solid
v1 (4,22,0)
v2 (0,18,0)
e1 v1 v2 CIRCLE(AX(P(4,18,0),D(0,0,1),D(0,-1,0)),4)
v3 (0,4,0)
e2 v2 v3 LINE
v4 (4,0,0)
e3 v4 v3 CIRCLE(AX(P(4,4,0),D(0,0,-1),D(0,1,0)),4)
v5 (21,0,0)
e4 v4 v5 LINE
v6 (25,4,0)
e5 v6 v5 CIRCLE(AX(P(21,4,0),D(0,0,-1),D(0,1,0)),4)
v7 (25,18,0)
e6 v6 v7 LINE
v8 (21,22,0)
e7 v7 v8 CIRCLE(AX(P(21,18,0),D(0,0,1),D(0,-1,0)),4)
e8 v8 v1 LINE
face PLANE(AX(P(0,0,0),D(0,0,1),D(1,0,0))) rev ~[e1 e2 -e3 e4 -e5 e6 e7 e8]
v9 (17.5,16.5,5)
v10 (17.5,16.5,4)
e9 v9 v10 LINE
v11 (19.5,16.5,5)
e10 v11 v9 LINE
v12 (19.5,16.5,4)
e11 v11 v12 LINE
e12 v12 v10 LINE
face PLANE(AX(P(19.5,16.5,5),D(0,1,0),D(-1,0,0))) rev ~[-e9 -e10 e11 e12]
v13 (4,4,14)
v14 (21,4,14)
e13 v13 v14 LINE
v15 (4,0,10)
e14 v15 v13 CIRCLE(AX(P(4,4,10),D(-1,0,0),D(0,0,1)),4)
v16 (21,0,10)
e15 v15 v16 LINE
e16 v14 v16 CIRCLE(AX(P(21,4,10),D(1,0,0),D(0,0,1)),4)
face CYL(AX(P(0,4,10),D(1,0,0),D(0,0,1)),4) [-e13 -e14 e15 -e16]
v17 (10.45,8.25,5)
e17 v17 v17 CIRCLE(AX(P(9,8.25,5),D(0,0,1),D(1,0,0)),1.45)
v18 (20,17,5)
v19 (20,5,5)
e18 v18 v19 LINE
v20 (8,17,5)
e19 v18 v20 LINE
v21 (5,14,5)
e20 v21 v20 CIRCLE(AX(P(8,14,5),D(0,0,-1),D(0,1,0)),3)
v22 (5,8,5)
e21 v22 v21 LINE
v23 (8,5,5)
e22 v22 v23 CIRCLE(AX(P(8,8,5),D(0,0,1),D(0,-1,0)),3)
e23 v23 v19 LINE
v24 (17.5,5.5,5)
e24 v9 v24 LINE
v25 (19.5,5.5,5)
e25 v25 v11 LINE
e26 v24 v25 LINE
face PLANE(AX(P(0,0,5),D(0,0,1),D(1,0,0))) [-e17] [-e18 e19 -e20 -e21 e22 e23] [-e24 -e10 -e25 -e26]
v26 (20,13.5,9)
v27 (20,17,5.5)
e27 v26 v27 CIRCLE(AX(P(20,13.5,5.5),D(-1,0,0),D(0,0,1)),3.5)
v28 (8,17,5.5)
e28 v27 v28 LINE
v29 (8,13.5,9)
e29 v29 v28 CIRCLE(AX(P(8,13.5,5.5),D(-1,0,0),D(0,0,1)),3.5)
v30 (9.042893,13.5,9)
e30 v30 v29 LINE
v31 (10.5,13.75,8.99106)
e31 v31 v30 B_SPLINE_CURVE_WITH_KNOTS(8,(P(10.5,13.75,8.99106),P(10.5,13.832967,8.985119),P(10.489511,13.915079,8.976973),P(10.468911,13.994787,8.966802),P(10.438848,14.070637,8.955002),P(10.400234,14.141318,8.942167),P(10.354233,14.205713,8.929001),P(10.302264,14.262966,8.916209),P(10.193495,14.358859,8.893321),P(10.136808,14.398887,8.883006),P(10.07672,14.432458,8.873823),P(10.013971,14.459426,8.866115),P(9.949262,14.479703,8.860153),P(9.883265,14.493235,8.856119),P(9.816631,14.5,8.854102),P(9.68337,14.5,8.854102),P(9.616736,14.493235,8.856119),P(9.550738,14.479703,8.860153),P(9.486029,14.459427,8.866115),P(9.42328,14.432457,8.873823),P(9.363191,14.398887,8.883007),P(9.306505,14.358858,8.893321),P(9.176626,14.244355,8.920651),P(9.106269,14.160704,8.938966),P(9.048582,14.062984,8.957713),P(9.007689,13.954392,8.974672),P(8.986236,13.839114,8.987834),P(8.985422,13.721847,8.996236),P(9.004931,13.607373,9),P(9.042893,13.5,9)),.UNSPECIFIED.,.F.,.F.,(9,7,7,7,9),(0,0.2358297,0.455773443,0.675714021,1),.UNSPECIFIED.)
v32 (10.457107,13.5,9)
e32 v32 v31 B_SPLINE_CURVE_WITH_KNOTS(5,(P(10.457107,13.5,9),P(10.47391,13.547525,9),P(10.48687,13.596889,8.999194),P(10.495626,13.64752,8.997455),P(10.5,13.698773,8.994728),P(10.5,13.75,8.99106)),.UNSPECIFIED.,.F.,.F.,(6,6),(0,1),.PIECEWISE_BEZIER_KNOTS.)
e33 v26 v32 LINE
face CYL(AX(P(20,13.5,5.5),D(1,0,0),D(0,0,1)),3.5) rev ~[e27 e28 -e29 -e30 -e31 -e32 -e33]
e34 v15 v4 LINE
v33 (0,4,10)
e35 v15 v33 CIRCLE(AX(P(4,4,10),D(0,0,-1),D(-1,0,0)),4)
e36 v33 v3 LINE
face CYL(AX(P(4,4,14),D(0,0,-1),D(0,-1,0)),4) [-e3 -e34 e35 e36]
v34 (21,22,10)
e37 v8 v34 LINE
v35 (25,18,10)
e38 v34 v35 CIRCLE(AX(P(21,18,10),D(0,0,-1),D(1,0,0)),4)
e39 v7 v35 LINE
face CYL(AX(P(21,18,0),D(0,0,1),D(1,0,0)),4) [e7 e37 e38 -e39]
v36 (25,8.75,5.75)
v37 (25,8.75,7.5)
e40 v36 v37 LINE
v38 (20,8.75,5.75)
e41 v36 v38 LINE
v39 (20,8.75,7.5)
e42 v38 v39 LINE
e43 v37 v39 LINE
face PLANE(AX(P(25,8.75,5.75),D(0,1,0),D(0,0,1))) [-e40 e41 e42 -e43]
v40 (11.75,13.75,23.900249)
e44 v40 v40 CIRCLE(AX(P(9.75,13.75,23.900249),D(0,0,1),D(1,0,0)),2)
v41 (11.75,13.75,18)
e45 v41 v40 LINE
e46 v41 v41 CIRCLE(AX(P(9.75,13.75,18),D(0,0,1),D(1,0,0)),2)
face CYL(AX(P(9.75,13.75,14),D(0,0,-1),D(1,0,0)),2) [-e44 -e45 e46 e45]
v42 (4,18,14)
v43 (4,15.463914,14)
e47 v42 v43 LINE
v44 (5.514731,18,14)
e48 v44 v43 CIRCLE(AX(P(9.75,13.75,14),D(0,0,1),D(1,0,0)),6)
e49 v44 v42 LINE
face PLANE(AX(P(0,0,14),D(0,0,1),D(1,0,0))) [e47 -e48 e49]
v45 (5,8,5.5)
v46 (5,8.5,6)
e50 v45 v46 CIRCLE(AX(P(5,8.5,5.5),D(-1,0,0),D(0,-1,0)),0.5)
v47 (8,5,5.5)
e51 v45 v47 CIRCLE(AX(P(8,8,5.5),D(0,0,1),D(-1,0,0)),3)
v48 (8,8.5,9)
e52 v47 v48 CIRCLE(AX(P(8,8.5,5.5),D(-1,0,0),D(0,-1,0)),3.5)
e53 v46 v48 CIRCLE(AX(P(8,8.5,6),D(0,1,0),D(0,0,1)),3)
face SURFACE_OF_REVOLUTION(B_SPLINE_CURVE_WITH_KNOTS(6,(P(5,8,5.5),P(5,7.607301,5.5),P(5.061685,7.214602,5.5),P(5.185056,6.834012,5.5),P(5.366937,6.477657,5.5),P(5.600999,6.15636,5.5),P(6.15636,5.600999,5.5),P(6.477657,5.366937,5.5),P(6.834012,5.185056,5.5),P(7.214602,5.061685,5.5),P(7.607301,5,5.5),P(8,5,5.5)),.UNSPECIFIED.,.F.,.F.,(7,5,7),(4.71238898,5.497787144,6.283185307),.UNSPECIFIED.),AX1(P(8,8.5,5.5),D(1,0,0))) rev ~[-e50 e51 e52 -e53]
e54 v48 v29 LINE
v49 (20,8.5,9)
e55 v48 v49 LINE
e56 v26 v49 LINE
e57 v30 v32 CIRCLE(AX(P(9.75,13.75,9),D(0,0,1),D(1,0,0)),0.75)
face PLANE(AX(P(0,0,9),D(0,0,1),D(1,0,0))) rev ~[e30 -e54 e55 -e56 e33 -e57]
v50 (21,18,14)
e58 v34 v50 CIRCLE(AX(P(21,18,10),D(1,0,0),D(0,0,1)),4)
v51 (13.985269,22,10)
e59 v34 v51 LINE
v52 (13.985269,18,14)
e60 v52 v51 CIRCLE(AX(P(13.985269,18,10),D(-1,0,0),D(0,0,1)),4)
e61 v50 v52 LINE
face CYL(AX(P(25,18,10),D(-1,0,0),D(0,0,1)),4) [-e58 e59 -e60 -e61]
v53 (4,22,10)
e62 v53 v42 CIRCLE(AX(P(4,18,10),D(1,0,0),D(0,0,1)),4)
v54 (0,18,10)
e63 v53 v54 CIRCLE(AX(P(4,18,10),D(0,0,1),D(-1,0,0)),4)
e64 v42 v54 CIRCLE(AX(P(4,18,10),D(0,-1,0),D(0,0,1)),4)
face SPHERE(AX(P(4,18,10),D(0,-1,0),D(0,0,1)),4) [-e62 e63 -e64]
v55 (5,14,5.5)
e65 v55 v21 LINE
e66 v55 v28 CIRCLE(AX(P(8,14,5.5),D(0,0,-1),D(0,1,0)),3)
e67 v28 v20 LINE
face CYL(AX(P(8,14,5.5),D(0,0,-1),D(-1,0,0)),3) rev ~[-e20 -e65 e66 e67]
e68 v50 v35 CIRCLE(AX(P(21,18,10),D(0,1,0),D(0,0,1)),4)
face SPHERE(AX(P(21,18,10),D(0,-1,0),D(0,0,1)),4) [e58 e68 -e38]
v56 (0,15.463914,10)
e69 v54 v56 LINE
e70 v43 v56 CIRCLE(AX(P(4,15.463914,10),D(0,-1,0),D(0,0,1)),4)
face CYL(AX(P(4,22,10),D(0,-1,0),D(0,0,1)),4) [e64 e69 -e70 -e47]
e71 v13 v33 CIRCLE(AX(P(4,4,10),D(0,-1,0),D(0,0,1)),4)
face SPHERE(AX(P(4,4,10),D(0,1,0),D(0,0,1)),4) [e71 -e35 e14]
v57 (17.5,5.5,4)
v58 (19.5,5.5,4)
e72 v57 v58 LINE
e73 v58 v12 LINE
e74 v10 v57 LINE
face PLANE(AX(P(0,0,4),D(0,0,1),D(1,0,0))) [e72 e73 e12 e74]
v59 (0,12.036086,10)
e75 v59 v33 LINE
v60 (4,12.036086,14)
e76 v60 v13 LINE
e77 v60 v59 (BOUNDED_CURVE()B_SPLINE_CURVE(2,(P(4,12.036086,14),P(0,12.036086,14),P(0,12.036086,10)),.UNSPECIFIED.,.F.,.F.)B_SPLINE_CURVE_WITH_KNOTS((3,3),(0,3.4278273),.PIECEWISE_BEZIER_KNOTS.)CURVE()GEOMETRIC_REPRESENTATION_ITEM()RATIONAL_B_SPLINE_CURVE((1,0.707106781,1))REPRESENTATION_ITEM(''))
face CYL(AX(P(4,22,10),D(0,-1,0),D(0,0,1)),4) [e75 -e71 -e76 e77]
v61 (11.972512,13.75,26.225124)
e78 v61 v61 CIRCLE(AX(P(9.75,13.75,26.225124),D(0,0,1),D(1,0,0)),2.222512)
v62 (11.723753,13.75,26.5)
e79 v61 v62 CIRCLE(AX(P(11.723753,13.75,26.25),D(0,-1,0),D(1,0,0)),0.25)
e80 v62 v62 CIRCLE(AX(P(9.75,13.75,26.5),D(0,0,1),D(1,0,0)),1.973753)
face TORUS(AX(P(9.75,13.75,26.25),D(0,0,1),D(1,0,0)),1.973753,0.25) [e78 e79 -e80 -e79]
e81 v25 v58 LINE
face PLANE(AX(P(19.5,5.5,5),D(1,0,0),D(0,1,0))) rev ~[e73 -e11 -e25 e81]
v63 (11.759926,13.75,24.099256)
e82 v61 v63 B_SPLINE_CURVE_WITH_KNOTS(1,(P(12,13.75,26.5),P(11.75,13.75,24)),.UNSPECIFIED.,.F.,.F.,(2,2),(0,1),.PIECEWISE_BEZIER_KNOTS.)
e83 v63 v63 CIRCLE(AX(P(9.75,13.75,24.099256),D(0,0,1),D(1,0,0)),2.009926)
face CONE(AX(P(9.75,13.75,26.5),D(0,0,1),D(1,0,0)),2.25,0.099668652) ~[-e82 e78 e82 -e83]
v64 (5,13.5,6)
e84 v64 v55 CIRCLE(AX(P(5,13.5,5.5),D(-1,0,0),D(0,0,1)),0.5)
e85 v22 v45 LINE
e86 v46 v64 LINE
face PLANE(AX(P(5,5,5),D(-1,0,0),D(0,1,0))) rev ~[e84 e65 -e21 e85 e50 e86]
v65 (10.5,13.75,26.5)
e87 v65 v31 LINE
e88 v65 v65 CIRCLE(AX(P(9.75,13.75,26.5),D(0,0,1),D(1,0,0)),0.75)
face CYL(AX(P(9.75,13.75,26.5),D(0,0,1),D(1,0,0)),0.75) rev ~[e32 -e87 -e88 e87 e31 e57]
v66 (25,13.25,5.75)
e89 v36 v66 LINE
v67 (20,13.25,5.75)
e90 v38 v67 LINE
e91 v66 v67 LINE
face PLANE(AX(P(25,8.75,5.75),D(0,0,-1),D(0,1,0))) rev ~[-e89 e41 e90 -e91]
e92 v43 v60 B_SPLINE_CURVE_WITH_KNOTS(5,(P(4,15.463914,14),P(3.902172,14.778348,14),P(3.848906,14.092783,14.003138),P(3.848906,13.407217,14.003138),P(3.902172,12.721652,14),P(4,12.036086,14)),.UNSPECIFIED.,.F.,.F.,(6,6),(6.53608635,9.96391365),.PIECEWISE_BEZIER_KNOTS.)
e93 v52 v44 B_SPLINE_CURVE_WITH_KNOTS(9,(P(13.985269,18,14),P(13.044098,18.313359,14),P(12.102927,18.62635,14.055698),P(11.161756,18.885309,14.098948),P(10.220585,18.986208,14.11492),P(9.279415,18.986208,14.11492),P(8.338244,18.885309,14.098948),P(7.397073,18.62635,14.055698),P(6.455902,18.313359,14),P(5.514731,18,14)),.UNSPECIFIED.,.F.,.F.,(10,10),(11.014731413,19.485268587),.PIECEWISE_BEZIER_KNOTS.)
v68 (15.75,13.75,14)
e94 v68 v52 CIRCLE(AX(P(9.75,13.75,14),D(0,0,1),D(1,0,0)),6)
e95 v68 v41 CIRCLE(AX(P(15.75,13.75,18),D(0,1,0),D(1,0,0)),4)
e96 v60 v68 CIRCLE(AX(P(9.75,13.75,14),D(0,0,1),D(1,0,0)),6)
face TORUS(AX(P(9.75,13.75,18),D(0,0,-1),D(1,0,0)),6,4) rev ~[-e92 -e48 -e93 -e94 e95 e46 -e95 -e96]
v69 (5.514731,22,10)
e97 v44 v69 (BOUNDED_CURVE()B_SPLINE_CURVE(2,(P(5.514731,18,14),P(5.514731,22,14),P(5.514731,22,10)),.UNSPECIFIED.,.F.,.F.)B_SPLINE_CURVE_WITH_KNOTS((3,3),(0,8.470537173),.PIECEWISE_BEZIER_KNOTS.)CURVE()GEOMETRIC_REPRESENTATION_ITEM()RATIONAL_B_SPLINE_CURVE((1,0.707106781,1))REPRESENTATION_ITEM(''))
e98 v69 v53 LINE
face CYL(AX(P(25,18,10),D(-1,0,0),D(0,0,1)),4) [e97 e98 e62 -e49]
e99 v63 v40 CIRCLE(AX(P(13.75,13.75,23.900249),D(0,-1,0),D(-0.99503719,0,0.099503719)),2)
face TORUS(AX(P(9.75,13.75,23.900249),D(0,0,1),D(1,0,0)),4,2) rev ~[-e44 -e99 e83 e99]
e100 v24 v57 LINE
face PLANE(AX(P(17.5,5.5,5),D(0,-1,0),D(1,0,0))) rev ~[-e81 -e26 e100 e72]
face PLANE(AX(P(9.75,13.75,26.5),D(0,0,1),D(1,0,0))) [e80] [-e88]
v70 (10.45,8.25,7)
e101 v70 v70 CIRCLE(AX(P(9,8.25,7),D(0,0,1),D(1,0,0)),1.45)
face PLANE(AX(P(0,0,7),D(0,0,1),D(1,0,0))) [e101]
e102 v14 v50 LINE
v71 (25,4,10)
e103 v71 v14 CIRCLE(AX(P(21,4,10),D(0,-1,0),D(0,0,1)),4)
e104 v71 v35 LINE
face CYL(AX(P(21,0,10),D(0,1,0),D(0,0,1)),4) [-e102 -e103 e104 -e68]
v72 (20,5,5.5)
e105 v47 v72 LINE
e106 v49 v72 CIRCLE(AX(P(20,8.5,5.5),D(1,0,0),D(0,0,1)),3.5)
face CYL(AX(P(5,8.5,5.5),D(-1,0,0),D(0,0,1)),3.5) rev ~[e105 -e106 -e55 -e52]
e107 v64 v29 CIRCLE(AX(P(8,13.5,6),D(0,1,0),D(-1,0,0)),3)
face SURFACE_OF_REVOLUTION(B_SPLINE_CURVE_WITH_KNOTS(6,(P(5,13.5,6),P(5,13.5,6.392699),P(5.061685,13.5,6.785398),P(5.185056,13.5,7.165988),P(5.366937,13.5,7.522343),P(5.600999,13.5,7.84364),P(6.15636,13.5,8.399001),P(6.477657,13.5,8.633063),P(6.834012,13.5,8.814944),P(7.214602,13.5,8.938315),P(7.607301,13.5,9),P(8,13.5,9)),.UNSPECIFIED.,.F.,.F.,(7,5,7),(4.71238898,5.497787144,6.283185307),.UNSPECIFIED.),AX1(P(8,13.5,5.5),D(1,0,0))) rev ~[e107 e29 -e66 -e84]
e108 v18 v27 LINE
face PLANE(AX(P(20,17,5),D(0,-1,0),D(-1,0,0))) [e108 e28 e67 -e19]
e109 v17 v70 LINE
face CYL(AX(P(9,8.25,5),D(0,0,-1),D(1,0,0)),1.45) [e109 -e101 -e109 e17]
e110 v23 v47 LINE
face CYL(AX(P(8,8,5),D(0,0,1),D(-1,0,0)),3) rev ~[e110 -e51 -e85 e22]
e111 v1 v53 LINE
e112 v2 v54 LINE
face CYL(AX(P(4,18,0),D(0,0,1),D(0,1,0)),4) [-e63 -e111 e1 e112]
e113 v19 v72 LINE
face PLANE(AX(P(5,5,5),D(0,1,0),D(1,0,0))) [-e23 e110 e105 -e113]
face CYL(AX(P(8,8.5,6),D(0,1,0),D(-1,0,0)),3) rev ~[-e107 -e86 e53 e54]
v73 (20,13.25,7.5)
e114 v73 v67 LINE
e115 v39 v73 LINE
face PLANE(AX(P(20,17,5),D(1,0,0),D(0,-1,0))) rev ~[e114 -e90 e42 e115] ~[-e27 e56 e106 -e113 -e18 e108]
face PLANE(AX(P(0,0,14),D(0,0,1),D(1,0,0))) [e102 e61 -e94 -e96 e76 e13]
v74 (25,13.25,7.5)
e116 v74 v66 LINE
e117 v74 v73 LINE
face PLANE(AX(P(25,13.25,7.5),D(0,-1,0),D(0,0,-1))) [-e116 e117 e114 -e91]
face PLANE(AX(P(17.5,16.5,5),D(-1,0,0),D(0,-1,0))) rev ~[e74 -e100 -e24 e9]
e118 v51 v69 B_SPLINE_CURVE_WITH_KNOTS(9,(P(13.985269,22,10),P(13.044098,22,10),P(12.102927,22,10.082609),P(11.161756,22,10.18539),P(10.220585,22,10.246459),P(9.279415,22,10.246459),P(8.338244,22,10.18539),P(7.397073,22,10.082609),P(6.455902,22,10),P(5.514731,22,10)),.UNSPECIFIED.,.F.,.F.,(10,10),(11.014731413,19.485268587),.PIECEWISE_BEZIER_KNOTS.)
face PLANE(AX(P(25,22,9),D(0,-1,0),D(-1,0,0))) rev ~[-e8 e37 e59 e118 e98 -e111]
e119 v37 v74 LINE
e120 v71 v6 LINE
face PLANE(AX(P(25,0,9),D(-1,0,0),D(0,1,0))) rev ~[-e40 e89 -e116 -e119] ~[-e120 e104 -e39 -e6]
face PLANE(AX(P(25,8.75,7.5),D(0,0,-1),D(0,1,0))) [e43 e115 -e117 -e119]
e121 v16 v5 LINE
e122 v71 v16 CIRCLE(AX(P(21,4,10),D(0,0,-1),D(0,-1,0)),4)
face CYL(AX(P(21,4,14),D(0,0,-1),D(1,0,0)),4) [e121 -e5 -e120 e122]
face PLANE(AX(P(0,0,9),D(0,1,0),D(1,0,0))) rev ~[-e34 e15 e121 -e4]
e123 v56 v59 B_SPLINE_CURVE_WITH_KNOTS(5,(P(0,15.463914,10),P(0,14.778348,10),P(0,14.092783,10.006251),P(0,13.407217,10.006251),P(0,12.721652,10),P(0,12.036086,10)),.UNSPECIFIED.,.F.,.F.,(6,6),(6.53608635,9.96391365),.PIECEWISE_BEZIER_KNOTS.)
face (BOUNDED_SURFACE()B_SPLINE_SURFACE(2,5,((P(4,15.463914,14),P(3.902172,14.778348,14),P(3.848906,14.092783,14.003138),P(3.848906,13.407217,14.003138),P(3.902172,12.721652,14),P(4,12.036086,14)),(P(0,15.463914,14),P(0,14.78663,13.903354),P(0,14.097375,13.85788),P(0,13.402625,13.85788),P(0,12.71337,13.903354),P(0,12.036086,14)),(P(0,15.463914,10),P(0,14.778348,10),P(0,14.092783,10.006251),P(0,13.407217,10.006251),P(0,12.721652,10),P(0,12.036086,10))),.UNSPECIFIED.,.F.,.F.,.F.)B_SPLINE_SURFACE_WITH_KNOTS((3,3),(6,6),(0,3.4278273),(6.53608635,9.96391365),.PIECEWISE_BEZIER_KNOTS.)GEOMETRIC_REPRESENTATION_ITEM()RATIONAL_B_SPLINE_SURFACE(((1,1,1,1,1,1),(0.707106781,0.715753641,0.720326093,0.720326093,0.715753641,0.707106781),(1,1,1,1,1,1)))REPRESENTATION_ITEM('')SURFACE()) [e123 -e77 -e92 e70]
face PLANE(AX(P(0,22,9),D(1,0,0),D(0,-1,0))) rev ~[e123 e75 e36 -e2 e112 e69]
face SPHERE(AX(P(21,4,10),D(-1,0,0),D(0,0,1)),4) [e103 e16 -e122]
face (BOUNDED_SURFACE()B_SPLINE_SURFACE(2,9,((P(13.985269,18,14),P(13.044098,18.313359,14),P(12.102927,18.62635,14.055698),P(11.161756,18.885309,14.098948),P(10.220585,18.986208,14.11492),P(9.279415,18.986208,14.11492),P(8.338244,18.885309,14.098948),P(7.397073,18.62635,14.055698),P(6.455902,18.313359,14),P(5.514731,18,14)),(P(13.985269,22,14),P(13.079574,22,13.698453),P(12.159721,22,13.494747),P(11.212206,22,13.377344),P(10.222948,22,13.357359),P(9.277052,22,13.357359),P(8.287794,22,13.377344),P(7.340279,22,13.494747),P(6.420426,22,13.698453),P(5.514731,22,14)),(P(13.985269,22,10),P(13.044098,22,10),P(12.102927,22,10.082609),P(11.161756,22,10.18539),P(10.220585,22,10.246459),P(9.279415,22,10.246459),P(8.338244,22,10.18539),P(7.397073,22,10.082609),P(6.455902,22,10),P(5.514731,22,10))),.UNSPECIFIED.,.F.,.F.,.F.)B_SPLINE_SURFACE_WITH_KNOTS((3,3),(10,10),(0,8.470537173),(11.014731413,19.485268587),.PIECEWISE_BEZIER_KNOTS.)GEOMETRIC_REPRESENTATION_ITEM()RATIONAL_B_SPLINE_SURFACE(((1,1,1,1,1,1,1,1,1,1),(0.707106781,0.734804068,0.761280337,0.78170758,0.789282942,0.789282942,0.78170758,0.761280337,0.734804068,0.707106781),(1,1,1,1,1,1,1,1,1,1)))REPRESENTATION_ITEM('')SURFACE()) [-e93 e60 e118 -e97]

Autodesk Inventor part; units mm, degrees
ref_plane "YZ Plane" through (0, 0, 0) normal (1, 0, 0) x (0, 1, 0)
sketch "Sketch1" plane through (0, 0, 0) normal (0, 0, 1) x (1, 0, 0)
  line L0 (0, 0) -> (25, 0)
  line L1 (25, 0) -> (25, 22)
  line L2 (25, 22) -> (0, 22)
  line L3 (0, 22) -> (0, 0)
  dimension "d0" = 25
  dimension "d1" = 22
extrude "Extrusion1" add sketch "Sketch1" along normal blind 5
sketch "Sketch2" plane through (0, 0, 5) normal (0, 0, 1) x (1, 0, 0)
  circle A0 centre (9, 8.25) radius 1.45
  line L0 (0, 0) -> (25, 0) projected
  line L1 (0, 22) -> (0, 0) projected
  dimension "d6" = 2.9
  dimension "d7" = 8.25
  dimension "d8" = 9
extrude "Extrusion2" add sketch "Sketch2" along normal blind 2
sketch "Sketch3" plane through (0, 0, 5) normal (0, 0, 1) x (1, 0, 0)
  line L0 (17.5, 5.5) -> (19.5, 5.5)
  line L1 (19.5, 5.5) -> (19.5, 16.5)
  line L2 (19.5, 16.5) -> (17.5, 16.5)
  line L3 (17.5, 16.5) -> (17.5, 5.5)
  line L4 (0, 0) -> (25, 0) projected
  line L5 (0, 22) -> (0, 0) projected
  circle A0 centre (9, 8.25) radius 1.45 construction
  dimension "d9" = 2
  dimension "d10" = 11
  dimension "d58" = 8.5
  dimension "d59" = 2.75
extrude "Extrusion3" cut sketch "Sketch3" against normal blind 1
sketch "Sketch4" plane through (0, 0, 5) normal (0, 0, 1) x (1, 0, 0)
  line L0 (0, 22) -> (25, 22)
  line L1 (25, 22) -> (25, 17)
  line L2 (25, 17) -> (0, 17)
  line L3 (0, 17) -> (0, 22)
  line L4 (25, 0) -> (25, 22) construction
  line L5 (25, 17) -> (20, 17)
  line L6 (20, 17) -> (20, 0)
  line L7 (20, 0) -> (25, 0)
  line L8 (25, 0) -> (25, 17)
  line L9 (0, 0) -> (25, 0) projected
  line L10 (20, 0) -> (0, 0)
  line L11 (0, 0) -> (0, 5)
  line L12 (0, 5) -> (20, 5)
  line L13 (20, 5) -> (20, 0)
  line L14 (0, 22) -> (0, 0) projected
  line L15 (0, 5) -> (5, 5)
  line L16 (5, 5) -> (5, 17)
  line L17 (5, 17) -> (0, 17)
  line L18 (0, 17) -> (0, 5)
  dimension "d16" = 5
  dimension "d17" = 5
  dimension "d18" = 5
  dimension "d19" = 5
extrude "Extrusion4" add sketch "Sketch4" along normal blind 4 contours L0 L1 L2 L3 | L2 L16 L12 L14 | L8 L7 L6 L2 | L12 L6 L9 L11
ref_plane "Work Plane2" through (0, 11, 0) normal (0, 1, 0) x (-1, 0, 0)
sketch "Sketch15" plane through (0, 0, 9) normal (0, 0, 1) x (1, 0, 0)
  line L0 (25, 22) -> (0, 22) projected
  line L1 (0, 22) -> (0, 0) projected
  line L2 (0, 0) -> (25, 0) projected
  line L3 (25, 0) -> (25, 22) projected
extrude "Extrusion15" add sketch "Sketch15" along normal blind 5
sketch "Sketch18" plane through (0, 0, 14) normal (0, 0, 1) x (1, 0, 0)
  circle A0 centre (9.75, 13.75) radius 2
  circle A1 centre (9, 8.25) radius 1.45 construction
  point P0 (0, 0)
  dimension "d70" = 4
  dimension "d107" = 5.5
  dimension "d108" = 0.75
extrude "Extrusion17" add sketch "Sketch18" along normal blind 10
fillet "Fillet5" radius 4 1 edges at (7.75, 13.75, 14)
fillet "Fillet6" radius 4 8 edges at (0, 11, 14) (12.5, 0, 14) (25, 11, 14) (12.5, 22, 14) (0, 0, 7) (25, 0, 7) (0, 22, 7) (25, 22, 7)
ref_plane "Work Plane4" through (9.75, 13.75, 26.5) normal (0, 0, 1) x (1, 0, 0)
sketch "Sketch21" plane through (9.75, 13.75, 26.5) normal (0, 0, 1) x (1, 0, 0)
  circle A0 centre (0, 0) radius 2 construction
  circle A1 centre (0, 0) radius 2.25
  point P0 (-9.75, -13.75)
  dimension "d91" = 0.25
loft "Loft3" add profiles "Sketch21" section 2 edges at (7.75, 13.75, 24)
fillet "Fillet8" radius 0.25 1 edges at (7.5, 13.75, 26.5)
fillet "Fillet9" radius 2 1 edges at (7.75, 13.75, 24)
sketch "Sketch22" plane through (9.75, 13.75, 26.5) normal (0, 0, 1) x (1, 0, 0)
  circle A0 centre (0, 0) radius 0.75
  point P0 (-9.75, -13.75)
  dimension "d98" = 1.5
extrude "Extrusion19" cut sketch "Sketch22" against normal blind 20
sketch "Sketch23" plane through (25, 4, 0) normal (1, 0, 0) x (0, 0, -1)
  line L0 (-9, 13) -> (-9, 1) construction
  line L1 (-5.75, 4.75) -> (-5.75, 9.25)
  line L2 (-7.5, 4.75) -> (-7.5, 9.25)
  line L3 (-5.75, 4.75) -> (-7.5, 4.75)
  line L4 (-5, 1.5) -> (-5, 12.5) projected
  line L5 (-7.5, 9.25) -> (-5.75, 9.25)
  point P0 (0, -4)
  point P1 (-9, 7)
  point P2 (-9, 7)
  dimension "d104" = 4.5
  dimension "d111" = 1.5
  dimension "d112" = 1.75
extrude "Extrusion20" cut sketch "Sketch23" against normal blind 5
fillet "Fillet10" radius 3.5 2 edges at (12.5, 17, 9) (12.5, 5, 9)
fillet "Fillet11" radius 3 5 edges at (5, 15.9749, 7.9749) (5, 17, 5.25) (5, 6.0251, 7.9749) (5, 5, 5.25) (5, 11, 9)
equation "\"d17\" = d16"
equation "\"d18\" = d16"
equation "\"d19\" = d16"
properties part number "DAQcapsule"
